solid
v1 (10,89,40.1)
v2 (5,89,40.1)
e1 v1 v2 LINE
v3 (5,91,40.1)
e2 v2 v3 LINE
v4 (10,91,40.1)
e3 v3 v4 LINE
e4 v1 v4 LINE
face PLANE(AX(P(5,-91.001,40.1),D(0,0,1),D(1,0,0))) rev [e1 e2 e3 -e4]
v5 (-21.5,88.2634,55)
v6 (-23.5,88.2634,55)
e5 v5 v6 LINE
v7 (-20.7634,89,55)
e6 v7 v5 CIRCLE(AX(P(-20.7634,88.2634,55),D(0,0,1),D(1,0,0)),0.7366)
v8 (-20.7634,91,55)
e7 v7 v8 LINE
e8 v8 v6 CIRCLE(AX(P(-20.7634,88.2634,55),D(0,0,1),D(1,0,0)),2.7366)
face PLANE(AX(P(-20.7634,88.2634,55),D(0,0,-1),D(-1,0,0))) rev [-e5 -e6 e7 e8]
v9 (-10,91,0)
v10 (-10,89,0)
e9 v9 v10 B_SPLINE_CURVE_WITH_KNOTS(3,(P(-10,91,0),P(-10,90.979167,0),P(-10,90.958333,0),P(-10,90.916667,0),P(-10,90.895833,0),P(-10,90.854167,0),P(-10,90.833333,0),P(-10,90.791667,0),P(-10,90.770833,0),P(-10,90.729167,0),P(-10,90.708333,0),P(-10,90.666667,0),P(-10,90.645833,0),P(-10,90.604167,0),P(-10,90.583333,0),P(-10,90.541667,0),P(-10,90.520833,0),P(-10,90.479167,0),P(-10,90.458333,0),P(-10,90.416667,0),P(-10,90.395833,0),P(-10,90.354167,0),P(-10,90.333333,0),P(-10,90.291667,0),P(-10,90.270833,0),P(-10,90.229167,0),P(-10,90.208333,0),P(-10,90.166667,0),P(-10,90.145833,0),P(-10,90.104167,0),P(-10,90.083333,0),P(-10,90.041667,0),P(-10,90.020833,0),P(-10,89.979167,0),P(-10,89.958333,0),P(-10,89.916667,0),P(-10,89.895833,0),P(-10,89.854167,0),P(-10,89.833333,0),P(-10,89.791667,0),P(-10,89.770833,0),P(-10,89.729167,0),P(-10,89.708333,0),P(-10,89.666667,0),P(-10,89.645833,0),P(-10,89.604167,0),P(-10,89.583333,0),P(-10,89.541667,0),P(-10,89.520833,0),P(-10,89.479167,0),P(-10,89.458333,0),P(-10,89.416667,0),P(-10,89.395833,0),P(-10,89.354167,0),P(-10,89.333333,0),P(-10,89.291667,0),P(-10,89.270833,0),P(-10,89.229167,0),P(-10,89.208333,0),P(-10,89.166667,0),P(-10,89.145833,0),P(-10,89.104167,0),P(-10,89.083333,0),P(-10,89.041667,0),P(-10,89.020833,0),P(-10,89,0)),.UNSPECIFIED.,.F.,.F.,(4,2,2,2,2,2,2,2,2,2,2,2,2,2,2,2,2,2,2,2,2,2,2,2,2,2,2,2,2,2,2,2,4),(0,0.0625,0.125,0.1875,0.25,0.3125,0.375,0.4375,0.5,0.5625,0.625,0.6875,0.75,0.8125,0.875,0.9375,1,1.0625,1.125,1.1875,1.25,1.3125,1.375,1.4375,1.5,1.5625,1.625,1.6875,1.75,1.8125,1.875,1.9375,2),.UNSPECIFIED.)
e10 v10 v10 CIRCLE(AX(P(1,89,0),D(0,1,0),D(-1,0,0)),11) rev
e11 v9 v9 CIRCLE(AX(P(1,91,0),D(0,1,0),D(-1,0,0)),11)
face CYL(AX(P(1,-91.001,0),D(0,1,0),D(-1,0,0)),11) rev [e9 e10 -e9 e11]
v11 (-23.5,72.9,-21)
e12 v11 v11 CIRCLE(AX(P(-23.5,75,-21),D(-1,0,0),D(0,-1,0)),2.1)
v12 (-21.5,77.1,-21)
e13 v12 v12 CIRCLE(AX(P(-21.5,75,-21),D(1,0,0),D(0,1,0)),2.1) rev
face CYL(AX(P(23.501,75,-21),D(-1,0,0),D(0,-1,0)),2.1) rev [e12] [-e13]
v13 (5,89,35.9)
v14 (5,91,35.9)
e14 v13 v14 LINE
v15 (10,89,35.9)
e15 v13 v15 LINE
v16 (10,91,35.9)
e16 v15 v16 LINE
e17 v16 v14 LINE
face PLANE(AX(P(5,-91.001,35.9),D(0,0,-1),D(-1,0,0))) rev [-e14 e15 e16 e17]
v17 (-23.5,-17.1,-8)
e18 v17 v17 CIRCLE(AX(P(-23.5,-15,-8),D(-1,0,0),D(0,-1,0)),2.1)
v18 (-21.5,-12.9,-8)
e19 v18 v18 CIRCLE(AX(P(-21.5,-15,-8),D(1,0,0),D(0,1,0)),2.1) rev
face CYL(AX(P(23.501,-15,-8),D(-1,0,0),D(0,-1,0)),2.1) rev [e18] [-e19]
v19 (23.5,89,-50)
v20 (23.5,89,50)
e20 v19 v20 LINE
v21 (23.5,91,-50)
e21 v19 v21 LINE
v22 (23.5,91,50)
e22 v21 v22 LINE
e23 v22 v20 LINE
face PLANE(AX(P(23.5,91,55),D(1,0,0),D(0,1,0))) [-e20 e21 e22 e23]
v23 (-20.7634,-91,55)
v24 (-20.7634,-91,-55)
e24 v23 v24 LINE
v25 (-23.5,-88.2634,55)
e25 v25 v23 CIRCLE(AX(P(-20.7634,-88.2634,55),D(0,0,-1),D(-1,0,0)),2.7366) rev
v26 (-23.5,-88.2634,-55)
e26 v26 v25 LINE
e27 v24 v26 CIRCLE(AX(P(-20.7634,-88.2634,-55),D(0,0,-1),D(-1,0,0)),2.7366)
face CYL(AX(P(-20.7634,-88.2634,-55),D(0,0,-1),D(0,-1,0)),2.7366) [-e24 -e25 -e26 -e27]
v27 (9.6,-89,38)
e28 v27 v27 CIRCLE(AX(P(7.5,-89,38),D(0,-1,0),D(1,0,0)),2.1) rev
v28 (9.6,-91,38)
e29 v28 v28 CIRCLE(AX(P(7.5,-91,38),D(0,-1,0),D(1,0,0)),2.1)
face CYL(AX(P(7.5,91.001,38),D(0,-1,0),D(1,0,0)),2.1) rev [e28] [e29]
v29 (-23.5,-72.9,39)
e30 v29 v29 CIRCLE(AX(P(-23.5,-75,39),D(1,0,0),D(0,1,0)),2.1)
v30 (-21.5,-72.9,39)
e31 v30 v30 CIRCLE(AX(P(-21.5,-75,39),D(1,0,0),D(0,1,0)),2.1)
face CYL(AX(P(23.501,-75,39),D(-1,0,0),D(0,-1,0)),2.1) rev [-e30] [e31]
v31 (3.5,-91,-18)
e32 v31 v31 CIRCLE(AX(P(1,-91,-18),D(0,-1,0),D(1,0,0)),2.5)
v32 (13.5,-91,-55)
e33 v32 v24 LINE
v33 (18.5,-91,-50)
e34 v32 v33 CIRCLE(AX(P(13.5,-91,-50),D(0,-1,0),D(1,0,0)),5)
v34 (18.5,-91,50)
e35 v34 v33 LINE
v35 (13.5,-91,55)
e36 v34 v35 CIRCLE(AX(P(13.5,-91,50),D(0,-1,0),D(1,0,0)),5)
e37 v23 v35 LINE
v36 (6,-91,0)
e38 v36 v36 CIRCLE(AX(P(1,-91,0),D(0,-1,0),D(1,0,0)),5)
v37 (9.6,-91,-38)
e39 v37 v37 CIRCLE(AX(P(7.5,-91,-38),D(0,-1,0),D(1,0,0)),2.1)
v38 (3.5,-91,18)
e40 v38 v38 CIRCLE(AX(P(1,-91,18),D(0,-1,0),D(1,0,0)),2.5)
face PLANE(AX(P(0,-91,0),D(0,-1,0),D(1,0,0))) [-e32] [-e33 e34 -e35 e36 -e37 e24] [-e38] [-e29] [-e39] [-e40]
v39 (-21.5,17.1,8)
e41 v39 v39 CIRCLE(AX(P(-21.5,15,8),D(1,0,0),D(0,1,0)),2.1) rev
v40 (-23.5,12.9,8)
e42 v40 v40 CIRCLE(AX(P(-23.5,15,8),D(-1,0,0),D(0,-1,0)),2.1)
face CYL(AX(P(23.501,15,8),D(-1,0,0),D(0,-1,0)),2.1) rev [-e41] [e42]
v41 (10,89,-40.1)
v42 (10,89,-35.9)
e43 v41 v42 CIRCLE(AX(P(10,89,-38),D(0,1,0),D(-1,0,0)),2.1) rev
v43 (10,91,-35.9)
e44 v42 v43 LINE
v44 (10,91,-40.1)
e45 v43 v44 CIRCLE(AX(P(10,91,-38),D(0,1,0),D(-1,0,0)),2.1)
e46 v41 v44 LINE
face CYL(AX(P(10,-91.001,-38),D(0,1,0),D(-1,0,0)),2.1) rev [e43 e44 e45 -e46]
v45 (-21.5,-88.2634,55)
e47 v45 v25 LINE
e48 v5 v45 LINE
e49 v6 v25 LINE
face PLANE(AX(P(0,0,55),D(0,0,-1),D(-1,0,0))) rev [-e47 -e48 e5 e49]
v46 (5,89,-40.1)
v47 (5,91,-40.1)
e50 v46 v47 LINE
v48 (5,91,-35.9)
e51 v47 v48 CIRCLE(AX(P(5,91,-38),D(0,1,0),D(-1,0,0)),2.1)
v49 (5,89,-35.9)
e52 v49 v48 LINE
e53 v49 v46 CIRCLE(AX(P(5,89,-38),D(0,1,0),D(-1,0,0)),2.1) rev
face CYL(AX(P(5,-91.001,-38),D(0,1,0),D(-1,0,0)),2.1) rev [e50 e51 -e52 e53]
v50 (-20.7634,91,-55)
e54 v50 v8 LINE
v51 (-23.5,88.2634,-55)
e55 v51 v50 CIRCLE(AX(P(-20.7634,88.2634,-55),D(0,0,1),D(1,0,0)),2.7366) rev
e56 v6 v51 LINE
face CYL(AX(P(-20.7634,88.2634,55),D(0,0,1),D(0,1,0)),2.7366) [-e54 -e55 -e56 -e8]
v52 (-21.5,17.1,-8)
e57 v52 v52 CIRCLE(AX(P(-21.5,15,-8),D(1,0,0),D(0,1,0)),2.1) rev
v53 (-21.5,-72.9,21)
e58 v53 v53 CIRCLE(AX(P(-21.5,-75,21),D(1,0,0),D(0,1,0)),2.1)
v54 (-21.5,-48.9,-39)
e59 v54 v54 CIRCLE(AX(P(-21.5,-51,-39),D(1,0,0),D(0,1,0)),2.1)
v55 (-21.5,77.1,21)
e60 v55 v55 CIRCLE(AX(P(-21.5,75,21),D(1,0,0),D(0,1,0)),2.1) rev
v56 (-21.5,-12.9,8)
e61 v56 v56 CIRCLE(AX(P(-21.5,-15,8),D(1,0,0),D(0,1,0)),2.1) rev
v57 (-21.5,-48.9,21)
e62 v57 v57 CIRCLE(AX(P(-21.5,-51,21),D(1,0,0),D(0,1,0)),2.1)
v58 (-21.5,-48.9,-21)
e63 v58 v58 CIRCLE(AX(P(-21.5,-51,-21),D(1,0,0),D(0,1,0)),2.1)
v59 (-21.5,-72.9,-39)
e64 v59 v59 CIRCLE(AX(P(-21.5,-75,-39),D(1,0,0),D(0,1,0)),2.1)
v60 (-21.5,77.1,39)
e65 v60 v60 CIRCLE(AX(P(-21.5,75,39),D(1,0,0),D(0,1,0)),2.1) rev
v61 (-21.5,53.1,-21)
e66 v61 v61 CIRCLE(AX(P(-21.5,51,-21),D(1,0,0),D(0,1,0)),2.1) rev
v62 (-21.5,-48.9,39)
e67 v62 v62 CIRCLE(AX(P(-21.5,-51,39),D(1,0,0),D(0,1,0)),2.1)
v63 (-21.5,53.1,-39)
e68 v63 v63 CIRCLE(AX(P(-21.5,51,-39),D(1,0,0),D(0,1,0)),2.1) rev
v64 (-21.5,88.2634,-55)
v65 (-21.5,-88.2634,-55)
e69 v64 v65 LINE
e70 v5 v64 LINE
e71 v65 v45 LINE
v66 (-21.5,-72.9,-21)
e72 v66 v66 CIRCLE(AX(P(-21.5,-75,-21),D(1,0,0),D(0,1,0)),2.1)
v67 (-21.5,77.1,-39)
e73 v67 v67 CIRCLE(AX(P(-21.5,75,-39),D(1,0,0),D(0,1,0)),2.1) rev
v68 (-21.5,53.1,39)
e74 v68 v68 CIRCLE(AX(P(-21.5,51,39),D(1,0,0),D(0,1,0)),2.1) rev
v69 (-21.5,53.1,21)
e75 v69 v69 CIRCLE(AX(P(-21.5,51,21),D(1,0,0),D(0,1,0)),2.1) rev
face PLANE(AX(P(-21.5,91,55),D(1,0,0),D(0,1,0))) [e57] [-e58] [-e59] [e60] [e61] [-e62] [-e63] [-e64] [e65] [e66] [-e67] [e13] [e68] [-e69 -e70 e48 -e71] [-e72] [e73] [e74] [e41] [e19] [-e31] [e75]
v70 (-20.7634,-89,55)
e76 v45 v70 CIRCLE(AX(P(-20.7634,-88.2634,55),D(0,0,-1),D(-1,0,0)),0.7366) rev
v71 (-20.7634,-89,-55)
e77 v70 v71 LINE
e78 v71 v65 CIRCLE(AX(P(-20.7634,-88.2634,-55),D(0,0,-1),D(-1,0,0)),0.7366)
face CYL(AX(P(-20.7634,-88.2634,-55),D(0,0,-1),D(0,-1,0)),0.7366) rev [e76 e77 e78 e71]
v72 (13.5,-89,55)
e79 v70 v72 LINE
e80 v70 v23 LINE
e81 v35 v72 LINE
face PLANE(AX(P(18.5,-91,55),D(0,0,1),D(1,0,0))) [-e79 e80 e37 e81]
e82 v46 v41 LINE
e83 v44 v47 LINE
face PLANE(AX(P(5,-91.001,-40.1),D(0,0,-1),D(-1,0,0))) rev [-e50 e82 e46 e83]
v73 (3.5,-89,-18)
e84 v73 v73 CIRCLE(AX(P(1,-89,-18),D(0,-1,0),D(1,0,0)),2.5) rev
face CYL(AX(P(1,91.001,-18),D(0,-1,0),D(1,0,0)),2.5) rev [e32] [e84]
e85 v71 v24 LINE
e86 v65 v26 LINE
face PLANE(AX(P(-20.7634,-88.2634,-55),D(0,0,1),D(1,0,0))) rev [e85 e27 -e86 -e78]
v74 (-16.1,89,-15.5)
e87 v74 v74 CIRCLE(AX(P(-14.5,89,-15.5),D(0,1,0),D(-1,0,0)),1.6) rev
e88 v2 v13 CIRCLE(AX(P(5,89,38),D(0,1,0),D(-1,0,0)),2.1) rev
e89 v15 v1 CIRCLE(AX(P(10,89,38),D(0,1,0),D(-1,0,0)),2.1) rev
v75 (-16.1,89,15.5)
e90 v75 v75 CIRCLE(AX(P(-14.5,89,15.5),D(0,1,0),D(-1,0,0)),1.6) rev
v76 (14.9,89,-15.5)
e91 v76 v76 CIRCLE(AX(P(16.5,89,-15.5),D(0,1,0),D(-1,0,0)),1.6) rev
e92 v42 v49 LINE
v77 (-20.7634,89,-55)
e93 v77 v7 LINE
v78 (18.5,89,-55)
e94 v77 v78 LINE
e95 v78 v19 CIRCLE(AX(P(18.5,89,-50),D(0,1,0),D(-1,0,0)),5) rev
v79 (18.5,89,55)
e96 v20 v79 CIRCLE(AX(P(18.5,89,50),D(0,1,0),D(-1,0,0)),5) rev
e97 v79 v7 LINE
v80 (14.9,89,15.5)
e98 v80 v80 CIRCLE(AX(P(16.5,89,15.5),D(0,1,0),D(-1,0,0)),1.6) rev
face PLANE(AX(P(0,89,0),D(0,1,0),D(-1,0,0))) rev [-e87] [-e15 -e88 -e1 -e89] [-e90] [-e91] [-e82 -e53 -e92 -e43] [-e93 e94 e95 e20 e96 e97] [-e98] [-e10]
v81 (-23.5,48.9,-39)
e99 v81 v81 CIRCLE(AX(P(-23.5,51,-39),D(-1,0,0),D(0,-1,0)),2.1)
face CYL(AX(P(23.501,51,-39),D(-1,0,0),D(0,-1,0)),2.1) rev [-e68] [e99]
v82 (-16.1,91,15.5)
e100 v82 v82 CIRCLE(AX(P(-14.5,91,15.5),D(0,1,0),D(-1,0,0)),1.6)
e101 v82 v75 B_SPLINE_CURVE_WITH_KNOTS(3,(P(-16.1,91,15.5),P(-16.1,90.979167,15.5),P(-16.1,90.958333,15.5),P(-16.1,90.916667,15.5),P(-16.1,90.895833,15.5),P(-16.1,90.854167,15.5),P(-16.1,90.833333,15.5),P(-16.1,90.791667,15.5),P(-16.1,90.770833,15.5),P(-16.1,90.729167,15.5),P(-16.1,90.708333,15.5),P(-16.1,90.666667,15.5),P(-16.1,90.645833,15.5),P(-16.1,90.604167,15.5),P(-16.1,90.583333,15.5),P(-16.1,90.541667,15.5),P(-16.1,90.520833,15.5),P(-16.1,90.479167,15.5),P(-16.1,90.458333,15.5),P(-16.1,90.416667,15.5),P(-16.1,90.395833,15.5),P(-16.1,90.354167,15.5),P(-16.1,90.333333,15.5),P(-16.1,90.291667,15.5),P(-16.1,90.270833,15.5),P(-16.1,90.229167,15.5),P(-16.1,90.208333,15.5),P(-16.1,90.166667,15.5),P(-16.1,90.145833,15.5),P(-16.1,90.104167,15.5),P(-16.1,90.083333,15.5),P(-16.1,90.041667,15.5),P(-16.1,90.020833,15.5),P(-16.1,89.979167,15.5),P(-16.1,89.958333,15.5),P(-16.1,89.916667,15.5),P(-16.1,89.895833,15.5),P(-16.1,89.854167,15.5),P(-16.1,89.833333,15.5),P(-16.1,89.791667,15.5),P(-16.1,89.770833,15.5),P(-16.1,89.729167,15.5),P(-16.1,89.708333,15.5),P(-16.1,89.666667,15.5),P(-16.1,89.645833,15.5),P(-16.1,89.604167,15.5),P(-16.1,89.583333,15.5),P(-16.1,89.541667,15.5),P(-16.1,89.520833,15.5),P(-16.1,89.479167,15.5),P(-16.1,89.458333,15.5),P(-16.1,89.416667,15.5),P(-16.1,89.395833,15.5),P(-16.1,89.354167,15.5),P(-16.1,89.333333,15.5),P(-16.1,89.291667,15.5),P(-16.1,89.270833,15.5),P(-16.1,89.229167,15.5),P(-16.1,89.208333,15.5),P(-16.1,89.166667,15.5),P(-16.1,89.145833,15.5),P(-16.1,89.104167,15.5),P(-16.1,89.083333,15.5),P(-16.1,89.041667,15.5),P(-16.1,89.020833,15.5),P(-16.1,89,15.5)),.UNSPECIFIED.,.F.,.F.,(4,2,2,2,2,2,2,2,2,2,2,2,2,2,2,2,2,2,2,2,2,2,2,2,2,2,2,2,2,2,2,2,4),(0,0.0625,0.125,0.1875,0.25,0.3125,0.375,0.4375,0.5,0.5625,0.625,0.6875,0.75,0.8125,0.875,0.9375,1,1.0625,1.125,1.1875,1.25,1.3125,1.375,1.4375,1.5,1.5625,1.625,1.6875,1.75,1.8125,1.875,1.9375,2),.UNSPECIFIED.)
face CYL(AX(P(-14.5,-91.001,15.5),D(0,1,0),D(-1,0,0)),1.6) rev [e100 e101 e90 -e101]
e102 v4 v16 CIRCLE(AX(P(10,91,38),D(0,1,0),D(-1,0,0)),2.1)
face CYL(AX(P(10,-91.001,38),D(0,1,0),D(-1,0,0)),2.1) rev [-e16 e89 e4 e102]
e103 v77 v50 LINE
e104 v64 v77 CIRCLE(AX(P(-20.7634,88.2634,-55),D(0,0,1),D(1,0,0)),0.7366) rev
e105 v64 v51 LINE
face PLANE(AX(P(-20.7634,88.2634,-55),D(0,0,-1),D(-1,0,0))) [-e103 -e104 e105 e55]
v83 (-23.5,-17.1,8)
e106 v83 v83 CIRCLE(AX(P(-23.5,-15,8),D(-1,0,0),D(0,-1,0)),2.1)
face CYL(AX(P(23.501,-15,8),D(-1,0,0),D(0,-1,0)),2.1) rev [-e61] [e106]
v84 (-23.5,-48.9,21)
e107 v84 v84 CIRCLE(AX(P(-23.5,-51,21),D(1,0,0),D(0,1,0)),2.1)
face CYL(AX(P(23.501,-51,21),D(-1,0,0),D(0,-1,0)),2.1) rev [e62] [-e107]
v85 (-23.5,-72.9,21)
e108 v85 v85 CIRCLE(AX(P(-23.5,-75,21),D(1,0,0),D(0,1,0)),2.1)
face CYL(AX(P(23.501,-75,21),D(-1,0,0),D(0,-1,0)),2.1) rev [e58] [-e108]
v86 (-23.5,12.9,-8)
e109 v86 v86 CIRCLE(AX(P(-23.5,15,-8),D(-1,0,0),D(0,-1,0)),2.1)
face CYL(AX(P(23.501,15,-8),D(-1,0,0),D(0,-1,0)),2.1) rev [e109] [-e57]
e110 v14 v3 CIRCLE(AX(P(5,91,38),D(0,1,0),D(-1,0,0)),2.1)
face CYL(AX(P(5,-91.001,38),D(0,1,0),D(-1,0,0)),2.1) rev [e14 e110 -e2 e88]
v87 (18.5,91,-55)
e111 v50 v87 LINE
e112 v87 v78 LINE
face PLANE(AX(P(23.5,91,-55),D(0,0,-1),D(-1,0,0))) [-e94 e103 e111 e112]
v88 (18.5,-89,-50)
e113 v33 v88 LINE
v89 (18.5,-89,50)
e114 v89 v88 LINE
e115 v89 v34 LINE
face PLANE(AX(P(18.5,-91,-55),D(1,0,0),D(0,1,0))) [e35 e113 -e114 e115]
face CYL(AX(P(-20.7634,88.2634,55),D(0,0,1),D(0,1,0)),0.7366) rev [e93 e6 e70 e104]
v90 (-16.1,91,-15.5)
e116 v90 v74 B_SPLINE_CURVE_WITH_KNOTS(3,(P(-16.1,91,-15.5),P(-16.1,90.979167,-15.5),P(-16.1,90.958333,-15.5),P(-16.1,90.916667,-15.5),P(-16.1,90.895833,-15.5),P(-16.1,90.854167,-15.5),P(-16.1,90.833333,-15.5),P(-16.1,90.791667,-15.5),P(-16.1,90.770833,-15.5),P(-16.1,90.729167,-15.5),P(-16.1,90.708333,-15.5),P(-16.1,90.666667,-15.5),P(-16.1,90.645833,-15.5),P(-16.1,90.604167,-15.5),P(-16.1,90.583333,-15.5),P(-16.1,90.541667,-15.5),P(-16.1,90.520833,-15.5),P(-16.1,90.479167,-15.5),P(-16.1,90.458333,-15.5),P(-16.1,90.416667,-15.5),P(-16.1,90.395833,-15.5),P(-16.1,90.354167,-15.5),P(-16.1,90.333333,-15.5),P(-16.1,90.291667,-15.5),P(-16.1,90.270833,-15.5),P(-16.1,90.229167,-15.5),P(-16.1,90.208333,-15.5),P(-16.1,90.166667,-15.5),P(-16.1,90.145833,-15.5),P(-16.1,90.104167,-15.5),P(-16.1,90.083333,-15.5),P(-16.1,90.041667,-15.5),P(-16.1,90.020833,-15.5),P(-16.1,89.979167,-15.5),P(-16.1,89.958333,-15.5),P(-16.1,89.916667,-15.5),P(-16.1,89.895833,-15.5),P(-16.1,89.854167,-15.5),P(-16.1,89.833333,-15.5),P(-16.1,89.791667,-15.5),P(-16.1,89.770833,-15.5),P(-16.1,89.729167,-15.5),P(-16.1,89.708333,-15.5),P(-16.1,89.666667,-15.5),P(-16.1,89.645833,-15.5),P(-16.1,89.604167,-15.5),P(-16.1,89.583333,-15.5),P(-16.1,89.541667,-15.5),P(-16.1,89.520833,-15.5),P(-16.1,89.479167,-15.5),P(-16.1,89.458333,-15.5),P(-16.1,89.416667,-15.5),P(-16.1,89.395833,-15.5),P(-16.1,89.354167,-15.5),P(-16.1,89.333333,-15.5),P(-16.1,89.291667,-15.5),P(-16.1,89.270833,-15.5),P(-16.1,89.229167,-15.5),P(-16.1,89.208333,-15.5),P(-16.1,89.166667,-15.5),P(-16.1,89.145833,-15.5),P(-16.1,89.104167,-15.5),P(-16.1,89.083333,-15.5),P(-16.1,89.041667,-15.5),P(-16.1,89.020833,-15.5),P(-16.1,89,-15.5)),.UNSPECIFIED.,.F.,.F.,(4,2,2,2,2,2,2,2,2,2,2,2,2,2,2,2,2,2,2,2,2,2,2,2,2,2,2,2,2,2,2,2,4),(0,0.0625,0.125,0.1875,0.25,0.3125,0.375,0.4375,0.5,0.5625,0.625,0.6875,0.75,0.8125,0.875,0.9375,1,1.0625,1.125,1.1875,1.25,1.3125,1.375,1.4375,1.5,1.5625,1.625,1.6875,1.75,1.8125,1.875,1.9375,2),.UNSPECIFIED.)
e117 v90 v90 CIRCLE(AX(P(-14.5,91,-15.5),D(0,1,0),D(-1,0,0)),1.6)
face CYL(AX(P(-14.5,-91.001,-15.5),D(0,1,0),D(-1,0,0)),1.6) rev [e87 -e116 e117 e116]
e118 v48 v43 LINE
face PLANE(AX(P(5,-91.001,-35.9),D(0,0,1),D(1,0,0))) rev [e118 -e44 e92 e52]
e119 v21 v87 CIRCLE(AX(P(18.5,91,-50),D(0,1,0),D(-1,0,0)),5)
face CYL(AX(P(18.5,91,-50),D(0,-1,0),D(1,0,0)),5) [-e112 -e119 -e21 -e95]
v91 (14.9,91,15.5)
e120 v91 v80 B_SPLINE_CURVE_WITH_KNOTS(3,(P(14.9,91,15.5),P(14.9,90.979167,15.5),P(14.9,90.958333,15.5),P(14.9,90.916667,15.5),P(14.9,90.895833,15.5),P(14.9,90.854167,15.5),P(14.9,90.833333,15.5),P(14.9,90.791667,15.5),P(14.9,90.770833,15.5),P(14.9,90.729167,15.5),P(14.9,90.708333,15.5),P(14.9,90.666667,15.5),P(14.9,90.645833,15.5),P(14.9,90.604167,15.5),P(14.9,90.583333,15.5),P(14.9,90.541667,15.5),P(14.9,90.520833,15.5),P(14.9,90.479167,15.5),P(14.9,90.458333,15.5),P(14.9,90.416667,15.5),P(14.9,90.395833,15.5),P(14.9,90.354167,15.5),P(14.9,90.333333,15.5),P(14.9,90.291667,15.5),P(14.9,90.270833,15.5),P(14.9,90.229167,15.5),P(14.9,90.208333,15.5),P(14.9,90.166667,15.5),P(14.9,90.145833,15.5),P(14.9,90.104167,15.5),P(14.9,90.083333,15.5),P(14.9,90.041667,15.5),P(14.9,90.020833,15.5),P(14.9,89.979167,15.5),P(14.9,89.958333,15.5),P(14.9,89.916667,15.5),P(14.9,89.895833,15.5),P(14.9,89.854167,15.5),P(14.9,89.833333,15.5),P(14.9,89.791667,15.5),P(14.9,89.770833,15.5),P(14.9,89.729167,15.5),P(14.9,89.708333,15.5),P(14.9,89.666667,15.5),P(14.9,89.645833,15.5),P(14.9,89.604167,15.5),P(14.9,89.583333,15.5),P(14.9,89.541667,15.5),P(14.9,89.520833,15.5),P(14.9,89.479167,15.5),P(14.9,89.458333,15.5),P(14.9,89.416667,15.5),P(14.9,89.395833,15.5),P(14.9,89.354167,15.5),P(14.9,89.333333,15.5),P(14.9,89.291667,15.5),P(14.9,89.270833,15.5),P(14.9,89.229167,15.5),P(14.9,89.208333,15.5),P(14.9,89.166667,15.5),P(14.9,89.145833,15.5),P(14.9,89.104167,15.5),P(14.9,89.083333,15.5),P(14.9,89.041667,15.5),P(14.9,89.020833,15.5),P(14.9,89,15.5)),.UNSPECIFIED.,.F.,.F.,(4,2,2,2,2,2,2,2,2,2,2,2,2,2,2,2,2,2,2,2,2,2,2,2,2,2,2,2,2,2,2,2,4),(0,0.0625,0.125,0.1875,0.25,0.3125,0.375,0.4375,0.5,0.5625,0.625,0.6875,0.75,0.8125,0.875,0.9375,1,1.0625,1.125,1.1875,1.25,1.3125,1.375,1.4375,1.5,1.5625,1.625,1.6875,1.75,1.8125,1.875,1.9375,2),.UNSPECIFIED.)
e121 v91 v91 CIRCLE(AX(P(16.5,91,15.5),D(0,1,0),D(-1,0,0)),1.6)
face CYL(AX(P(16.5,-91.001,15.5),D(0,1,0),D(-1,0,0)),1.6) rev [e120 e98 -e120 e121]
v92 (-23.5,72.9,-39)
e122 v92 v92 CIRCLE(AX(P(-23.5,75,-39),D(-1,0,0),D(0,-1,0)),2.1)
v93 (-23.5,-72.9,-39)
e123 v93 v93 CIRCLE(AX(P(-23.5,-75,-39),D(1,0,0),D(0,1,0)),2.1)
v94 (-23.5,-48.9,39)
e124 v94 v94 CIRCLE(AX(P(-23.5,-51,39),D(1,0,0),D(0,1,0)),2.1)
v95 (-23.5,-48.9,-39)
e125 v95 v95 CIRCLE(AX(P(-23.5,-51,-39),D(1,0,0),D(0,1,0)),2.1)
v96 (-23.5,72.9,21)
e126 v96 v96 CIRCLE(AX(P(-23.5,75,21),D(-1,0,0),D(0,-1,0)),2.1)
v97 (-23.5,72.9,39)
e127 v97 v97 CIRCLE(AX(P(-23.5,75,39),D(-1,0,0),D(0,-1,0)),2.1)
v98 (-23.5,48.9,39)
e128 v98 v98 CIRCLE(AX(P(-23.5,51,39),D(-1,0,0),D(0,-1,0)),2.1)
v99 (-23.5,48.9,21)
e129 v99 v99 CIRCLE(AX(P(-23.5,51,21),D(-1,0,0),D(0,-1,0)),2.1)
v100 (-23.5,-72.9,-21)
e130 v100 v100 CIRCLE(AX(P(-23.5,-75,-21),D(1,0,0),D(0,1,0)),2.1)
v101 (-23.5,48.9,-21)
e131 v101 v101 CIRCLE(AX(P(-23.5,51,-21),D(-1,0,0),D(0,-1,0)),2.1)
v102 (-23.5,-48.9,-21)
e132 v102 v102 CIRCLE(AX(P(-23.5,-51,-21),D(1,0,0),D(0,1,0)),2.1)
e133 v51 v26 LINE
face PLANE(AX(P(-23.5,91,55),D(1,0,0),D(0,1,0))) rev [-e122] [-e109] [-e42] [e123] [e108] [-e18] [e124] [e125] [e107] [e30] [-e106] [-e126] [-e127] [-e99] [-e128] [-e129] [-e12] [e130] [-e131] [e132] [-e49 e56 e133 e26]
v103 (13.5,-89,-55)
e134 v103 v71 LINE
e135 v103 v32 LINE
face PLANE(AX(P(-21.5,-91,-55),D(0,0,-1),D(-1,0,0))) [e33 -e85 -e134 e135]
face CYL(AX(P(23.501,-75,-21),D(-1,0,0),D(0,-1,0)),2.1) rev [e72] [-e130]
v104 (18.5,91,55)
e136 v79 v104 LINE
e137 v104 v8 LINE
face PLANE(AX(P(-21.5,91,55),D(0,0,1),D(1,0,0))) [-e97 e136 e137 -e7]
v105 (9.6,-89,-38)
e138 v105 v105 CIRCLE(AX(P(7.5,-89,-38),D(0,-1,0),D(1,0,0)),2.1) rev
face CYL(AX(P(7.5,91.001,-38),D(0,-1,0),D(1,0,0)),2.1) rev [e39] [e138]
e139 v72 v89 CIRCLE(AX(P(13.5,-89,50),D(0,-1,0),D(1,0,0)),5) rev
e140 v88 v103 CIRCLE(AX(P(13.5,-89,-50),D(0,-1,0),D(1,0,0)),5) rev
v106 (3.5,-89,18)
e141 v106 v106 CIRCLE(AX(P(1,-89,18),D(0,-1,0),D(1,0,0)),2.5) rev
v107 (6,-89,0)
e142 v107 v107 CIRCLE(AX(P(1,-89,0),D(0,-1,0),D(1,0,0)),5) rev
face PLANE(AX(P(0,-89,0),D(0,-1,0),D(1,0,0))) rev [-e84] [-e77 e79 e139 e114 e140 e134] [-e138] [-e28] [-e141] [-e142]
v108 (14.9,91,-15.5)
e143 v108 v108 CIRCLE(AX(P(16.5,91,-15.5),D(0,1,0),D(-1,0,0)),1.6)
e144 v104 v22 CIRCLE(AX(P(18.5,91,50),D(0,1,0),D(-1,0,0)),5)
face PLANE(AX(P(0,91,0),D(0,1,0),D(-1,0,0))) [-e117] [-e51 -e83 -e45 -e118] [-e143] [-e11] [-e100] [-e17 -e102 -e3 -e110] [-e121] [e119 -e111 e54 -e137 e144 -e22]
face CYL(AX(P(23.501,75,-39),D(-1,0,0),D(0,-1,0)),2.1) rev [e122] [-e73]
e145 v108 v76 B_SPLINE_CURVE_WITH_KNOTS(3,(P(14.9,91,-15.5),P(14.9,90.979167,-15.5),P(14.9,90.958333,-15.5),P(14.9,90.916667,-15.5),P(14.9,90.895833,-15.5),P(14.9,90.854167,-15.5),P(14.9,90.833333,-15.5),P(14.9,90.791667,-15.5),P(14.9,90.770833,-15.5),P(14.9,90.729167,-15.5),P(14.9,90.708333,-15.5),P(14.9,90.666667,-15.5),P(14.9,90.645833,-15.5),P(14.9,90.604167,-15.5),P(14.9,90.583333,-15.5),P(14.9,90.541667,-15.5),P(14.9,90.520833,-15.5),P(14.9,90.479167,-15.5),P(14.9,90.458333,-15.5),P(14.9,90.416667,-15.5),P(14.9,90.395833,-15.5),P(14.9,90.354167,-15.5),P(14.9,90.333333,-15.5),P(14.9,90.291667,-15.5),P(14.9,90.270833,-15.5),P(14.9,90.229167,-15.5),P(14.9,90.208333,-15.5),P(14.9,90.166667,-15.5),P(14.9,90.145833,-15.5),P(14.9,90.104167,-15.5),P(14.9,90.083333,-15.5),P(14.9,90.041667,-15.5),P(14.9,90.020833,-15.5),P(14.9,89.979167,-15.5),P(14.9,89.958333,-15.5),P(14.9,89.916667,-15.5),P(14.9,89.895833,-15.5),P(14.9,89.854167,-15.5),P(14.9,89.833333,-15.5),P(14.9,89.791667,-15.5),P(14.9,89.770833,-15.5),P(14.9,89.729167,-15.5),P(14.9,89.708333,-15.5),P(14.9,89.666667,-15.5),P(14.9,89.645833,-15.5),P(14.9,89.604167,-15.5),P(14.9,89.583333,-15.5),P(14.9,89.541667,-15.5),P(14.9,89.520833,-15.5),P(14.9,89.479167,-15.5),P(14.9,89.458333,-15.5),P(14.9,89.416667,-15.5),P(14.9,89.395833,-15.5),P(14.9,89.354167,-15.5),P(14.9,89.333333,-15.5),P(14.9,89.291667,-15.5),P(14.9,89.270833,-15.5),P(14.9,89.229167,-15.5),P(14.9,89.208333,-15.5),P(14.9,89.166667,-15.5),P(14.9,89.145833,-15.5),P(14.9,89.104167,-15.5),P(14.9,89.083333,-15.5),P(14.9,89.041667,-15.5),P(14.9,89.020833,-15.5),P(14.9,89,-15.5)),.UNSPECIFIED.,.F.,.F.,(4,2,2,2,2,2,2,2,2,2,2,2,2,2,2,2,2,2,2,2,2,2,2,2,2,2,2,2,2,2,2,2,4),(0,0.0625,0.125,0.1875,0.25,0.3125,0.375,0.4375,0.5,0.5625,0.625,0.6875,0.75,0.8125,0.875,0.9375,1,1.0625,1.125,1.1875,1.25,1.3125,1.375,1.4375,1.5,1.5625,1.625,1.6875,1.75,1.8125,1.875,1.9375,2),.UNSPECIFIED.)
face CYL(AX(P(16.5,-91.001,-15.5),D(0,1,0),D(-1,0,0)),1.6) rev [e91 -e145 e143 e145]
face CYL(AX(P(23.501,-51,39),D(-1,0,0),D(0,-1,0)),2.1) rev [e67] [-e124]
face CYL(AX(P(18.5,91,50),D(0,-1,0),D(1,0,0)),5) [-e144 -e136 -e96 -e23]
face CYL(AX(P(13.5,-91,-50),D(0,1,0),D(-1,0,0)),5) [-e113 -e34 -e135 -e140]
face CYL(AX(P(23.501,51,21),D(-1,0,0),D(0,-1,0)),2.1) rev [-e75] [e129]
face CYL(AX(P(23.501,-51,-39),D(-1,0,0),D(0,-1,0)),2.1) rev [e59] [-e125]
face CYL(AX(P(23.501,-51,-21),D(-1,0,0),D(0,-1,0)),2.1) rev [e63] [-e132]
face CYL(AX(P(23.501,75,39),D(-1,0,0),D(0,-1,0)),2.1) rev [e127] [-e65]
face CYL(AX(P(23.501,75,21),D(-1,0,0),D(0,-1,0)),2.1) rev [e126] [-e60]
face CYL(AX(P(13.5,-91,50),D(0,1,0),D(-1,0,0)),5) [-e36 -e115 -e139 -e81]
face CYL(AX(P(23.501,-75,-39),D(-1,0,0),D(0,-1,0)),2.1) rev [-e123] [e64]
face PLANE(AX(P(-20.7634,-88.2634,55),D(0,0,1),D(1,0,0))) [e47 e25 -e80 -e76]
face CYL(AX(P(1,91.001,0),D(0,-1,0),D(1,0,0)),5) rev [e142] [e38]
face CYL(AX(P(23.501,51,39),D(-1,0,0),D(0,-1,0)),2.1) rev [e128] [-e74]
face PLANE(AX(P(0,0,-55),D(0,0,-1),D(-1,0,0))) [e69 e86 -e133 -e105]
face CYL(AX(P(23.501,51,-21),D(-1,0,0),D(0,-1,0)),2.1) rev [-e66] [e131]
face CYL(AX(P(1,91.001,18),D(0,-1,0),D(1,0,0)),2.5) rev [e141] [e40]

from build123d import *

# Parameters (mm, degrees)
SKETCH1_W                    = 2
SKETCH1_H                    = 182
BASE_FLANGE1_DEPTH           = 55
EDGE_FLANGE1_STRIP_W         = 9.4732
EDGE_FLANGE1_STRIP_H         = 2
EDGE_FLANGE1_STRIP_CUT_DEPTH = 110
EDGE_FLANGE1_DEPTH           = 110
EDGE_FLANGE2_STRIP_W         = 9.4732
EDGE_FLANGE2_STRIP_H         = 2
EDGE_FLANGE2_STRIP_CUT_DEPTH = 110
EDGE_FLANGE2_DEPTH           = 110
FILLET1_R                    = 5
CUT_EXTRUDE1_REACH           = 118.254
SKETCH13_R                   = 2.1
CUT_EXTRUDE2_REACH           = 193.576
SKETCH14_R                   = 11
SKETCH14_R_2                 = 1.6
CUT_EXTRUDE3_REACH           = 193.576
SKETCH15_R                   = 2.5
SKETCH15_R_2                 = 5
CUT_EXTRUDE4_REACH           = 118.254
SKETCH16_R                   = 2.1
CUT_EXTRUDE5_REACH           = 193.576
CUT_EXTRUDE6_REACH           = 193.576
SKETCH18_R                   = 2.1


# Sheet-metal steps are written as plain solids
with BuildPart() as part:
    # Sketch1 → Base-Flange1 (new, symmetric)
    with BuildSketch(Plane.XY):
        with Locations((-22.5, 0)):
            Rectangle(SKETCH1_W, SKETCH1_H)
    extrude(amount=BASE_FLANGE1_DEPTH, both=True)

    # Edge-Flange1 strip (across the edge) → Edge-Flange1 strip cut (cut)
    with BuildSketch(Plane(origin=(-21.5, 91, -55), x_dir=(0, -1, 0), z_dir=(0, 0, 1))):
        with Locations((-2, -1)):
            Rectangle(EDGE_FLANGE1_STRIP_W, EDGE_FLANGE1_STRIP_H)
    extrude(amount=EDGE_FLANGE1_STRIP_CUT_DEPTH, mode=Mode.SUBTRACT)

    # Edge-Flange1 section (across the edge) → Edge-Flange1 (add)
    with BuildSketch(Plane(origin=(-21.5, 91, -55), x_dir=(0, -1, 0), z_dir=(0, 0, 1))):
        with BuildLine():
            Line((0, 0.7366), (0, 45))
            Line((0, 45), (2, 45))
            Line((2, 45), (2, 0.7366))
            ThreePointArc((2, 0.7366), (2.215745145, 0.215745145), (2.7366, 0))
            Line((2.7366, 0), (2.7366, -2))
            ThreePointArc((2.7366, -2), (0.801531583, -1.198468417), (0, 0.7366))
        make_face()
    extrude(amount=EDGE_FLANGE1_DEPTH)

    # Edge-Flange2 strip (across the edge) → Edge-Flange2 strip cut (cut)
    with BuildSketch(Plane(origin=(-21.5, -91, 55), x_dir=(0, 1, 0), z_dir=(0, 0, -1))):
        with Locations((-2, -1)):
            Rectangle(EDGE_FLANGE2_STRIP_W, EDGE_FLANGE2_STRIP_H)
    extrude(amount=EDGE_FLANGE2_STRIP_CUT_DEPTH, mode=Mode.SUBTRACT)

    # Edge-Flange2 section (across the edge) → Edge-Flange2 (add)
    with BuildSketch(Plane(origin=(-21.5, -91, 55), x_dir=(0, 1, 0), z_dir=(0, 0, -1))):
        with BuildLine():
            Line((0, 0.7366), (0, 40))
            Line((0, 40), (2, 40))
            Line((2, 40), (2, 0.7366))
            ThreePointArc((2, 0.7366), (2.215745145, 0.215745145), (2.7366, 0))
            Line((2.7366, 0), (2.7366, -2))
            ThreePointArc((2.7366, -2), (0.801531583, -1.198468417), (0, 0.7366))
        make_face()
    extrude(amount=EDGE_FLANGE2_DEPTH)

    # Fillet1
    fillet1_edges = [part.edges().sort_by_distance(p)[0] for p in [
        (23.5, 90, -55),
        (23.5, 90, 55),
        (18.5, -90, -55),
        (18.5, -90, 55),
    ]]
    fillet(fillet1_edges, radius=FILLET1_R)

    # Sketch13 → Cut-Extrude1 (cut, up to next)
    with BuildSketch(Plane.ZY.offset(23.5), mode=Mode.PRIVATE) as cut_extrude1_sk1:
        with Locations(Location((-39, 75, 0), (0, 0, 270))):
            Circle(SKETCH13_R)
    cut_extrude1_tool1 = extrude(cut_extrude1_sk1.sketch, amount=-CUT_EXTRUDE1_REACH, mode=Mode.PRIVATE) & part.part
    # Sketch13 → Cut-Extrude1 (cut, up to next)
    with BuildSketch(Plane.ZY.offset(23.5), mode=Mode.PRIVATE) as cut_extrude1_sk2:
        with Locations(Location((-39, 51, 0), (0, 0, 270))):
            Circle(SKETCH13_R)
    cut_extrude1_tool2 = extrude(cut_extrude1_sk2.sketch, amount=-CUT_EXTRUDE1_REACH, mode=Mode.PRIVATE) & part.part
    # Sketch13 → Cut-Extrude1 (cut, up to next)
    with BuildSketch(Plane.ZY.offset(23.5), mode=Mode.PRIVATE) as cut_extrude1_sk3:
        with Locations(Location((-21, 75, 0), (0, 0, 270))):
            Circle(SKETCH13_R)
    cut_extrude1_tool3 = extrude(cut_extrude1_sk3.sketch, amount=-CUT_EXTRUDE1_REACH, mode=Mode.PRIVATE) & part.part
    # Sketch13 → Cut-Extrude1 (cut, up to next)
    with BuildSketch(Plane.ZY.offset(23.5), mode=Mode.PRIVATE) as cut_extrude1_sk4:
        with Locations(Location((-21, 51, 0), (0, 0, 270))):
            Circle(SKETCH13_R)
    cut_extrude1_tool4 = extrude(cut_extrude1_sk4.sketch, amount=-CUT_EXTRUDE1_REACH, mode=Mode.PRIVATE) & part.part
    # Sketch13 → Cut-Extrude1 (cut, up to next)
    with BuildSketch(Plane.ZY.offset(23.5), mode=Mode.PRIVATE) as cut_extrude1_sk5:
        with Locations(Location((21, 75, 0), (0, 0, 270))):
            Circle(SKETCH13_R)
    cut_extrude1_tool5 = extrude(cut_extrude1_sk5.sketch, amount=-CUT_EXTRUDE1_REACH, mode=Mode.PRIVATE) & part.part
    # Sketch13 → Cut-Extrude1 (cut, up to next)
    with BuildSketch(Plane.ZY.offset(23.5), mode=Mode.PRIVATE) as cut_extrude1_sk6:
        with Locations(Location((21, 51, 0), (0, 0, 270))):
            Circle(SKETCH13_R)
    cut_extrude1_tool6 = extrude(cut_extrude1_sk6.sketch, amount=-CUT_EXTRUDE1_REACH, mode=Mode.PRIVATE) & part.part
    # Sketch13 → Cut-Extrude1 (cut, up to next)
    with BuildSketch(Plane.ZY.offset(23.5), mode=Mode.PRIVATE) as cut_extrude1_sk7:
        with Locations(Location((39, 75, 0), (0, 0, 270))):
            Circle(SKETCH13_R)
    cut_extrude1_tool7 = extrude(cut_extrude1_sk7.sketch, amount=-CUT_EXTRUDE1_REACH, mode=Mode.PRIVATE) & part.part
    # Sketch13 → Cut-Extrude1 (cut, up to next)
    with BuildSketch(Plane.ZY.offset(23.5), mode=Mode.PRIVATE) as cut_extrude1_sk8:
        with Locations(Location((39, 51, 0), (0, 0, 270))):
            Circle(SKETCH13_R)
    cut_extrude1_tool8 = extrude(cut_extrude1_sk8.sketch, amount=-CUT_EXTRUDE1_REACH, mode=Mode.PRIVATE) & part.part
    cut_extrude1_1 = cut_extrude1_tool1.solids().sort_by_distance((-23.5, 75, -39))[0]
    add(cut_extrude1_1, mode=Mode.SUBTRACT)
    cut_extrude1_2 = cut_extrude1_tool2.solids().sort_by_distance((-23.5, 51, -39))[0]
    add(cut_extrude1_2, mode=Mode.SUBTRACT)
    cut_extrude1_3 = cut_extrude1_tool3.solids().sort_by_distance((-23.5, 75, -21))[0]
    add(cut_extrude1_3, mode=Mode.SUBTRACT)
    cut_extrude1_4 = cut_extrude1_tool4.solids().sort_by_distance((-23.5, 51, -21))[0]
    add(cut_extrude1_4, mode=Mode.SUBTRACT)
    cut_extrude1_5 = cut_extrude1_tool5.solids().sort_by_distance((-23.5, 75, 21))[0]
    add(cut_extrude1_5, mode=Mode.SUBTRACT)
    cut_extrude1_6 = cut_extrude1_tool6.solids().sort_by_distance((-23.5, 51, 21))[0]
    add(cut_extrude1_6, mode=Mode.SUBTRACT)
    cut_extrude1_7 = cut_extrude1_tool7.solids().sort_by_distance((-23.5, 75, 39))[0]
    add(cut_extrude1_7, mode=Mode.SUBTRACT)
    cut_extrude1_8 = cut_extrude1_tool8.solids().sort_by_distance((-23.5, 51, 39))[0]
    add(cut_extrude1_8, mode=Mode.SUBTRACT)
    cut_extrude1 = cut_extrude1_1 + cut_extrude1_2 + cut_extrude1_3 + cut_extrude1_4 + cut_extrude1_5 + cut_extrude1_6 + cut_extrude1_7 + cut_extrude1_8  # Cut-Extrude1 as one shape, for the pattern or mirror that repeats it

    # Mirror1: Cut-Extrude1 across plane
    add(cut_extrude1.mirror(Plane.ZX), mode=Mode.SUBTRACT)

    # Sketch14 → Cut-Extrude2 (cut, up to next)
    with BuildSketch(Plane(origin=(0, 91, 0), x_dir=(1, 0, 0), z_dir=(0, 1, 0)), mode=Mode.PRIVATE) as cut_extrude2_sk1:
        with Locations(Location((1, 0, 0), (0, 0, 180))):
            Circle(SKETCH14_R)
    cut_extrude2_tool1 = extrude(cut_extrude2_sk1.sketch, amount=-CUT_EXTRUDE2_REACH, mode=Mode.PRIVATE) & part.part
    # Sketch14 → Cut-Extrude2 (cut, up to next)
    with BuildSketch(Plane(origin=(0, 91, 0), x_dir=(1, 0, 0), z_dir=(0, 1, 0)), mode=Mode.PRIVATE) as cut_extrude2_sk2:
        with Locations(Location((-14.5, 15.5, 0), (0, 0, 180))):
            Circle(SKETCH14_R_2)
    cut_extrude2_tool2 = extrude(cut_extrude2_sk2.sketch, amount=-CUT_EXTRUDE2_REACH, mode=Mode.PRIVATE) & part.part
    # Sketch14 → Cut-Extrude2 (cut, up to next)
    with BuildSketch(Plane(origin=(0, 91, 0), x_dir=(1, 0, 0), z_dir=(0, 1, 0)), mode=Mode.PRIVATE) as cut_extrude2_sk3:
        with Locations(Location((16.5, 15.5, 0), (0, 0, 180))):
            Circle(SKETCH14_R_2)
    cut_extrude2_tool3 = extrude(cut_extrude2_sk3.sketch, amount=-CUT_EXTRUDE2_REACH, mode=Mode.PRIVATE) & part.part
    # Sketch14 → Cut-Extrude2 (cut, up to next)
    with BuildSketch(Plane(origin=(0, 91, 0), x_dir=(1, 0, 0), z_dir=(0, 1, 0)), mode=Mode.PRIVATE) as cut_extrude2_sk4:
        with Locations(Location((-14.5, -15.5, 0), (0, 0, 180))):
            Circle(SKETCH14_R_2)
    cut_extrude2_tool4 = extrude(cut_extrude2_sk4.sketch, amount=-CUT_EXTRUDE2_REACH, mode=Mode.PRIVATE) & part.part
    # Sketch14 → Cut-Extrude2 (cut, up to next)
    with BuildSketch(Plane(origin=(0, 91, 0), x_dir=(1, 0, 0), z_dir=(0, 1, 0)), mode=Mode.PRIVATE) as cut_extrude2_sk5:
        with Locations(Location((16.5, -15.5, 0), (0, 0, 180))):
            Circle(SKETCH14_R_2)
    cut_extrude2_tool5 = extrude(cut_extrude2_sk5.sketch, amount=-CUT_EXTRUDE2_REACH, mode=Mode.PRIVATE) & part.part
    add(cut_extrude2_tool1.solids().sort_by_distance((1, 91, 0))[0], mode=Mode.SUBTRACT)
    add(cut_extrude2_tool2.solids().sort_by_distance((-14.5, 91, -15.5))[0], mode=Mode.SUBTRACT)
    add(cut_extrude2_tool3.solids().sort_by_distance((16.5, 91, -15.5))[0], mode=Mode.SUBTRACT)
    add(cut_extrude2_tool4.solids().sort_by_distance((-14.5, 91, 15.5))[0], mode=Mode.SUBTRACT)
    add(cut_extrude2_tool5.solids().sort_by_distance((16.5, 91, 15.5))[0], mode=Mode.SUBTRACT)

    # Sketch15 → Cut-Extrude3 (cut, up to next)
    with BuildSketch(Plane.XZ.offset(91), mode=Mode.PRIVATE) as cut_extrude3_sk1:
        with Locations((1, 18)):
            Circle(SKETCH15_R)
    cut_extrude3_tool1 = extrude(cut_extrude3_sk1.sketch, amount=-CUT_EXTRUDE3_REACH, mode=Mode.PRIVATE) & part.part
    # Sketch15 → Cut-Extrude3 (cut, up to next)
    with BuildSketch(Plane.XZ.offset(91), mode=Mode.PRIVATE) as cut_extrude3_sk2:
        with Locations((1, -18)):
            Circle(SKETCH15_R)
    cut_extrude3_tool2 = extrude(cut_extrude3_sk2.sketch, amount=-CUT_EXTRUDE3_REACH, mode=Mode.PRIVATE) & part.part
    # Sketch15 → Cut-Extrude3 (cut, up to next)
    with BuildSketch(Plane.XZ.offset(91), mode=Mode.PRIVATE) as cut_extrude3_sk3:
        with Locations((1, 0)):
            Circle(SKETCH15_R_2)
    cut_extrude3_tool3 = extrude(cut_extrude3_sk3.sketch, amount=-CUT_EXTRUDE3_REACH, mode=Mode.PRIVATE) & part.part
    add(cut_extrude3_tool1.solids().sort_by_distance((1, -91, 18))[0], mode=Mode.SUBTRACT)
    add(cut_extrude3_tool2.solids().sort_by_distance((1, -91, -18))[0], mode=Mode.SUBTRACT)
    add(cut_extrude3_tool3.solids().sort_by_distance((1, -91, 0))[0], mode=Mode.SUBTRACT)

    # Sketch16 → Cut-Extrude4 (cut, up to next)
    with BuildSketch(Plane.ZY.offset(23.5), mode=Mode.PRIVATE) as cut_extrude4_sk1:
        with Locations(Location((-8, 15, 0), (0, 0, 270))):
            Circle(SKETCH16_R)
    cut_extrude4_tool1 = extrude(cut_extrude4_sk1.sketch, amount=-CUT_EXTRUDE4_REACH, mode=Mode.PRIVATE) & part.part
    # Sketch16 → Cut-Extrude4 (cut, up to next)
    with BuildSketch(Plane.ZY.offset(23.5), mode=Mode.PRIVATE) as cut_extrude4_sk2:
        with Locations(Location((-8, -15, 0), (0, 0, 270))):
            Circle(SKETCH16_R)
    cut_extrude4_tool2 = extrude(cut_extrude4_sk2.sketch, amount=-CUT_EXTRUDE4_REACH, mode=Mode.PRIVATE) & part.part
    # Sketch16 → Cut-Extrude4 (cut, up to next)
    with BuildSketch(Plane.ZY.offset(23.5), mode=Mode.PRIVATE) as cut_extrude4_sk3:
        with Locations(Location((8, 15, 0), (0, 0, 270))):
            Circle(SKETCH16_R)
    cut_extrude4_tool3 = extrude(cut_extrude4_sk3.sketch, amount=-CUT_EXTRUDE4_REACH, mode=Mode.PRIVATE) & part.part
    # Sketch16 → Cut-Extrude4 (cut, up to next)
    with BuildSketch(Plane.ZY.offset(23.5), mode=Mode.PRIVATE) as cut_extrude4_sk4:
        with Locations(Location((8, -15, 0), (0, 0, 270))):
            Circle(SKETCH16_R)
    cut_extrude4_tool4 = extrude(cut_extrude4_sk4.sketch, amount=-CUT_EXTRUDE4_REACH, mode=Mode.PRIVATE) & part.part
    add(cut_extrude4_tool1.solids().sort_by_distance((-23.5, 15, -8))[0], mode=Mode.SUBTRACT)
    add(cut_extrude4_tool2.solids().sort_by_distance((-23.5, -15, -8))[0], mode=Mode.SUBTRACT)
    add(cut_extrude4_tool3.solids().sort_by_distance((-23.5, 15, 8))[0], mode=Mode.SUBTRACT)
    add(cut_extrude4_tool4.solids().sort_by_distance((-23.5, -15, 8))[0], mode=Mode.SUBTRACT)

    # Sketch17 → Cut-Extrude5 (cut, up to next)
    with BuildSketch(Plane(origin=(0, 91, 0), x_dir=(1, 0, 0), z_dir=(0, 1, 0)), mode=Mode.PRIVATE) as cut_extrude5_sk1:
        with BuildLine():
            Line((5, 40.1), (10, 40.1))
            ThreePointArc((10, 40.1), (12.1, 38), (10, 35.9))
            Line((10, 35.9), (5, 35.9))
            ThreePointArc((5, 35.9), (2.9, 38), (5, 40.1))
        make_face()
    cut_extrude5_tool1 = extrude(cut_extrude5_sk1.sketch, amount=-CUT_EXTRUDE5_REACH, mode=Mode.PRIVATE) & part.part
    # Sketch17 → Cut-Extrude5 (cut, up to next)
    with BuildSketch(Plane(origin=(0, 91, 0), x_dir=(1, 0, 0), z_dir=(0, 1, 0)), mode=Mode.PRIVATE) as cut_extrude5_sk2:
        with BuildLine():
            Line((5, -35.9), (10, -35.9))
            ThreePointArc((10, -35.9), (12.1, -38), (10, -40.1))
            Line((10, -40.1), (5, -40.1))
            ThreePointArc((5, -40.1), (2.9, -38), (5, -35.9))
        make_face()
    cut_extrude5_tool2 = extrude(cut_extrude5_sk2.sketch, amount=-CUT_EXTRUDE5_REACH, mode=Mode.PRIVATE) & part.part
    add(cut_extrude5_tool1.solids().sort_by_distance((7.5, 91, -38))[0], mode=Mode.SUBTRACT)
    add(cut_extrude5_tool2.solids().sort_by_distance((7.5, 91, 38))[0], mode=Mode.SUBTRACT)

    # Sketch18 → Cut-Extrude6 (cut, up to next)
    with BuildSketch(Plane.XZ.offset(91), mode=Mode.PRIVATE) as cut_extrude6_sk1:
        with Locations((7.5, 38)):
            Circle(SKETCH18_R)
    cut_extrude6_tool1 = extrude(cut_extrude6_sk1.sketch, amount=-CUT_EXTRUDE6_REACH, mode=Mode.PRIVATE) & part.part
    # Sketch18 → Cut-Extrude6 (cut, up to next)
    with BuildSketch(Plane.XZ.offset(91), mode=Mode.PRIVATE) as cut_extrude6_sk2:
        with Locations((7.5, -38)):
            Circle(SKETCH18_R)
    cut_extrude6_tool2 = extrude(cut_extrude6_sk2.sketch, amount=-CUT_EXTRUDE6_REACH, mode=Mode.PRIVATE) & part.part
    add(cut_extrude6_tool1.solids().sort_by_distance((7.5, -91, 38))[0], mode=Mode.SUBTRACT)
    add(cut_extrude6_tool2.solids().sort_by_distance((7.5, -91, -38))[0], mode=Mode.SUBTRACT)


solid = part.part
